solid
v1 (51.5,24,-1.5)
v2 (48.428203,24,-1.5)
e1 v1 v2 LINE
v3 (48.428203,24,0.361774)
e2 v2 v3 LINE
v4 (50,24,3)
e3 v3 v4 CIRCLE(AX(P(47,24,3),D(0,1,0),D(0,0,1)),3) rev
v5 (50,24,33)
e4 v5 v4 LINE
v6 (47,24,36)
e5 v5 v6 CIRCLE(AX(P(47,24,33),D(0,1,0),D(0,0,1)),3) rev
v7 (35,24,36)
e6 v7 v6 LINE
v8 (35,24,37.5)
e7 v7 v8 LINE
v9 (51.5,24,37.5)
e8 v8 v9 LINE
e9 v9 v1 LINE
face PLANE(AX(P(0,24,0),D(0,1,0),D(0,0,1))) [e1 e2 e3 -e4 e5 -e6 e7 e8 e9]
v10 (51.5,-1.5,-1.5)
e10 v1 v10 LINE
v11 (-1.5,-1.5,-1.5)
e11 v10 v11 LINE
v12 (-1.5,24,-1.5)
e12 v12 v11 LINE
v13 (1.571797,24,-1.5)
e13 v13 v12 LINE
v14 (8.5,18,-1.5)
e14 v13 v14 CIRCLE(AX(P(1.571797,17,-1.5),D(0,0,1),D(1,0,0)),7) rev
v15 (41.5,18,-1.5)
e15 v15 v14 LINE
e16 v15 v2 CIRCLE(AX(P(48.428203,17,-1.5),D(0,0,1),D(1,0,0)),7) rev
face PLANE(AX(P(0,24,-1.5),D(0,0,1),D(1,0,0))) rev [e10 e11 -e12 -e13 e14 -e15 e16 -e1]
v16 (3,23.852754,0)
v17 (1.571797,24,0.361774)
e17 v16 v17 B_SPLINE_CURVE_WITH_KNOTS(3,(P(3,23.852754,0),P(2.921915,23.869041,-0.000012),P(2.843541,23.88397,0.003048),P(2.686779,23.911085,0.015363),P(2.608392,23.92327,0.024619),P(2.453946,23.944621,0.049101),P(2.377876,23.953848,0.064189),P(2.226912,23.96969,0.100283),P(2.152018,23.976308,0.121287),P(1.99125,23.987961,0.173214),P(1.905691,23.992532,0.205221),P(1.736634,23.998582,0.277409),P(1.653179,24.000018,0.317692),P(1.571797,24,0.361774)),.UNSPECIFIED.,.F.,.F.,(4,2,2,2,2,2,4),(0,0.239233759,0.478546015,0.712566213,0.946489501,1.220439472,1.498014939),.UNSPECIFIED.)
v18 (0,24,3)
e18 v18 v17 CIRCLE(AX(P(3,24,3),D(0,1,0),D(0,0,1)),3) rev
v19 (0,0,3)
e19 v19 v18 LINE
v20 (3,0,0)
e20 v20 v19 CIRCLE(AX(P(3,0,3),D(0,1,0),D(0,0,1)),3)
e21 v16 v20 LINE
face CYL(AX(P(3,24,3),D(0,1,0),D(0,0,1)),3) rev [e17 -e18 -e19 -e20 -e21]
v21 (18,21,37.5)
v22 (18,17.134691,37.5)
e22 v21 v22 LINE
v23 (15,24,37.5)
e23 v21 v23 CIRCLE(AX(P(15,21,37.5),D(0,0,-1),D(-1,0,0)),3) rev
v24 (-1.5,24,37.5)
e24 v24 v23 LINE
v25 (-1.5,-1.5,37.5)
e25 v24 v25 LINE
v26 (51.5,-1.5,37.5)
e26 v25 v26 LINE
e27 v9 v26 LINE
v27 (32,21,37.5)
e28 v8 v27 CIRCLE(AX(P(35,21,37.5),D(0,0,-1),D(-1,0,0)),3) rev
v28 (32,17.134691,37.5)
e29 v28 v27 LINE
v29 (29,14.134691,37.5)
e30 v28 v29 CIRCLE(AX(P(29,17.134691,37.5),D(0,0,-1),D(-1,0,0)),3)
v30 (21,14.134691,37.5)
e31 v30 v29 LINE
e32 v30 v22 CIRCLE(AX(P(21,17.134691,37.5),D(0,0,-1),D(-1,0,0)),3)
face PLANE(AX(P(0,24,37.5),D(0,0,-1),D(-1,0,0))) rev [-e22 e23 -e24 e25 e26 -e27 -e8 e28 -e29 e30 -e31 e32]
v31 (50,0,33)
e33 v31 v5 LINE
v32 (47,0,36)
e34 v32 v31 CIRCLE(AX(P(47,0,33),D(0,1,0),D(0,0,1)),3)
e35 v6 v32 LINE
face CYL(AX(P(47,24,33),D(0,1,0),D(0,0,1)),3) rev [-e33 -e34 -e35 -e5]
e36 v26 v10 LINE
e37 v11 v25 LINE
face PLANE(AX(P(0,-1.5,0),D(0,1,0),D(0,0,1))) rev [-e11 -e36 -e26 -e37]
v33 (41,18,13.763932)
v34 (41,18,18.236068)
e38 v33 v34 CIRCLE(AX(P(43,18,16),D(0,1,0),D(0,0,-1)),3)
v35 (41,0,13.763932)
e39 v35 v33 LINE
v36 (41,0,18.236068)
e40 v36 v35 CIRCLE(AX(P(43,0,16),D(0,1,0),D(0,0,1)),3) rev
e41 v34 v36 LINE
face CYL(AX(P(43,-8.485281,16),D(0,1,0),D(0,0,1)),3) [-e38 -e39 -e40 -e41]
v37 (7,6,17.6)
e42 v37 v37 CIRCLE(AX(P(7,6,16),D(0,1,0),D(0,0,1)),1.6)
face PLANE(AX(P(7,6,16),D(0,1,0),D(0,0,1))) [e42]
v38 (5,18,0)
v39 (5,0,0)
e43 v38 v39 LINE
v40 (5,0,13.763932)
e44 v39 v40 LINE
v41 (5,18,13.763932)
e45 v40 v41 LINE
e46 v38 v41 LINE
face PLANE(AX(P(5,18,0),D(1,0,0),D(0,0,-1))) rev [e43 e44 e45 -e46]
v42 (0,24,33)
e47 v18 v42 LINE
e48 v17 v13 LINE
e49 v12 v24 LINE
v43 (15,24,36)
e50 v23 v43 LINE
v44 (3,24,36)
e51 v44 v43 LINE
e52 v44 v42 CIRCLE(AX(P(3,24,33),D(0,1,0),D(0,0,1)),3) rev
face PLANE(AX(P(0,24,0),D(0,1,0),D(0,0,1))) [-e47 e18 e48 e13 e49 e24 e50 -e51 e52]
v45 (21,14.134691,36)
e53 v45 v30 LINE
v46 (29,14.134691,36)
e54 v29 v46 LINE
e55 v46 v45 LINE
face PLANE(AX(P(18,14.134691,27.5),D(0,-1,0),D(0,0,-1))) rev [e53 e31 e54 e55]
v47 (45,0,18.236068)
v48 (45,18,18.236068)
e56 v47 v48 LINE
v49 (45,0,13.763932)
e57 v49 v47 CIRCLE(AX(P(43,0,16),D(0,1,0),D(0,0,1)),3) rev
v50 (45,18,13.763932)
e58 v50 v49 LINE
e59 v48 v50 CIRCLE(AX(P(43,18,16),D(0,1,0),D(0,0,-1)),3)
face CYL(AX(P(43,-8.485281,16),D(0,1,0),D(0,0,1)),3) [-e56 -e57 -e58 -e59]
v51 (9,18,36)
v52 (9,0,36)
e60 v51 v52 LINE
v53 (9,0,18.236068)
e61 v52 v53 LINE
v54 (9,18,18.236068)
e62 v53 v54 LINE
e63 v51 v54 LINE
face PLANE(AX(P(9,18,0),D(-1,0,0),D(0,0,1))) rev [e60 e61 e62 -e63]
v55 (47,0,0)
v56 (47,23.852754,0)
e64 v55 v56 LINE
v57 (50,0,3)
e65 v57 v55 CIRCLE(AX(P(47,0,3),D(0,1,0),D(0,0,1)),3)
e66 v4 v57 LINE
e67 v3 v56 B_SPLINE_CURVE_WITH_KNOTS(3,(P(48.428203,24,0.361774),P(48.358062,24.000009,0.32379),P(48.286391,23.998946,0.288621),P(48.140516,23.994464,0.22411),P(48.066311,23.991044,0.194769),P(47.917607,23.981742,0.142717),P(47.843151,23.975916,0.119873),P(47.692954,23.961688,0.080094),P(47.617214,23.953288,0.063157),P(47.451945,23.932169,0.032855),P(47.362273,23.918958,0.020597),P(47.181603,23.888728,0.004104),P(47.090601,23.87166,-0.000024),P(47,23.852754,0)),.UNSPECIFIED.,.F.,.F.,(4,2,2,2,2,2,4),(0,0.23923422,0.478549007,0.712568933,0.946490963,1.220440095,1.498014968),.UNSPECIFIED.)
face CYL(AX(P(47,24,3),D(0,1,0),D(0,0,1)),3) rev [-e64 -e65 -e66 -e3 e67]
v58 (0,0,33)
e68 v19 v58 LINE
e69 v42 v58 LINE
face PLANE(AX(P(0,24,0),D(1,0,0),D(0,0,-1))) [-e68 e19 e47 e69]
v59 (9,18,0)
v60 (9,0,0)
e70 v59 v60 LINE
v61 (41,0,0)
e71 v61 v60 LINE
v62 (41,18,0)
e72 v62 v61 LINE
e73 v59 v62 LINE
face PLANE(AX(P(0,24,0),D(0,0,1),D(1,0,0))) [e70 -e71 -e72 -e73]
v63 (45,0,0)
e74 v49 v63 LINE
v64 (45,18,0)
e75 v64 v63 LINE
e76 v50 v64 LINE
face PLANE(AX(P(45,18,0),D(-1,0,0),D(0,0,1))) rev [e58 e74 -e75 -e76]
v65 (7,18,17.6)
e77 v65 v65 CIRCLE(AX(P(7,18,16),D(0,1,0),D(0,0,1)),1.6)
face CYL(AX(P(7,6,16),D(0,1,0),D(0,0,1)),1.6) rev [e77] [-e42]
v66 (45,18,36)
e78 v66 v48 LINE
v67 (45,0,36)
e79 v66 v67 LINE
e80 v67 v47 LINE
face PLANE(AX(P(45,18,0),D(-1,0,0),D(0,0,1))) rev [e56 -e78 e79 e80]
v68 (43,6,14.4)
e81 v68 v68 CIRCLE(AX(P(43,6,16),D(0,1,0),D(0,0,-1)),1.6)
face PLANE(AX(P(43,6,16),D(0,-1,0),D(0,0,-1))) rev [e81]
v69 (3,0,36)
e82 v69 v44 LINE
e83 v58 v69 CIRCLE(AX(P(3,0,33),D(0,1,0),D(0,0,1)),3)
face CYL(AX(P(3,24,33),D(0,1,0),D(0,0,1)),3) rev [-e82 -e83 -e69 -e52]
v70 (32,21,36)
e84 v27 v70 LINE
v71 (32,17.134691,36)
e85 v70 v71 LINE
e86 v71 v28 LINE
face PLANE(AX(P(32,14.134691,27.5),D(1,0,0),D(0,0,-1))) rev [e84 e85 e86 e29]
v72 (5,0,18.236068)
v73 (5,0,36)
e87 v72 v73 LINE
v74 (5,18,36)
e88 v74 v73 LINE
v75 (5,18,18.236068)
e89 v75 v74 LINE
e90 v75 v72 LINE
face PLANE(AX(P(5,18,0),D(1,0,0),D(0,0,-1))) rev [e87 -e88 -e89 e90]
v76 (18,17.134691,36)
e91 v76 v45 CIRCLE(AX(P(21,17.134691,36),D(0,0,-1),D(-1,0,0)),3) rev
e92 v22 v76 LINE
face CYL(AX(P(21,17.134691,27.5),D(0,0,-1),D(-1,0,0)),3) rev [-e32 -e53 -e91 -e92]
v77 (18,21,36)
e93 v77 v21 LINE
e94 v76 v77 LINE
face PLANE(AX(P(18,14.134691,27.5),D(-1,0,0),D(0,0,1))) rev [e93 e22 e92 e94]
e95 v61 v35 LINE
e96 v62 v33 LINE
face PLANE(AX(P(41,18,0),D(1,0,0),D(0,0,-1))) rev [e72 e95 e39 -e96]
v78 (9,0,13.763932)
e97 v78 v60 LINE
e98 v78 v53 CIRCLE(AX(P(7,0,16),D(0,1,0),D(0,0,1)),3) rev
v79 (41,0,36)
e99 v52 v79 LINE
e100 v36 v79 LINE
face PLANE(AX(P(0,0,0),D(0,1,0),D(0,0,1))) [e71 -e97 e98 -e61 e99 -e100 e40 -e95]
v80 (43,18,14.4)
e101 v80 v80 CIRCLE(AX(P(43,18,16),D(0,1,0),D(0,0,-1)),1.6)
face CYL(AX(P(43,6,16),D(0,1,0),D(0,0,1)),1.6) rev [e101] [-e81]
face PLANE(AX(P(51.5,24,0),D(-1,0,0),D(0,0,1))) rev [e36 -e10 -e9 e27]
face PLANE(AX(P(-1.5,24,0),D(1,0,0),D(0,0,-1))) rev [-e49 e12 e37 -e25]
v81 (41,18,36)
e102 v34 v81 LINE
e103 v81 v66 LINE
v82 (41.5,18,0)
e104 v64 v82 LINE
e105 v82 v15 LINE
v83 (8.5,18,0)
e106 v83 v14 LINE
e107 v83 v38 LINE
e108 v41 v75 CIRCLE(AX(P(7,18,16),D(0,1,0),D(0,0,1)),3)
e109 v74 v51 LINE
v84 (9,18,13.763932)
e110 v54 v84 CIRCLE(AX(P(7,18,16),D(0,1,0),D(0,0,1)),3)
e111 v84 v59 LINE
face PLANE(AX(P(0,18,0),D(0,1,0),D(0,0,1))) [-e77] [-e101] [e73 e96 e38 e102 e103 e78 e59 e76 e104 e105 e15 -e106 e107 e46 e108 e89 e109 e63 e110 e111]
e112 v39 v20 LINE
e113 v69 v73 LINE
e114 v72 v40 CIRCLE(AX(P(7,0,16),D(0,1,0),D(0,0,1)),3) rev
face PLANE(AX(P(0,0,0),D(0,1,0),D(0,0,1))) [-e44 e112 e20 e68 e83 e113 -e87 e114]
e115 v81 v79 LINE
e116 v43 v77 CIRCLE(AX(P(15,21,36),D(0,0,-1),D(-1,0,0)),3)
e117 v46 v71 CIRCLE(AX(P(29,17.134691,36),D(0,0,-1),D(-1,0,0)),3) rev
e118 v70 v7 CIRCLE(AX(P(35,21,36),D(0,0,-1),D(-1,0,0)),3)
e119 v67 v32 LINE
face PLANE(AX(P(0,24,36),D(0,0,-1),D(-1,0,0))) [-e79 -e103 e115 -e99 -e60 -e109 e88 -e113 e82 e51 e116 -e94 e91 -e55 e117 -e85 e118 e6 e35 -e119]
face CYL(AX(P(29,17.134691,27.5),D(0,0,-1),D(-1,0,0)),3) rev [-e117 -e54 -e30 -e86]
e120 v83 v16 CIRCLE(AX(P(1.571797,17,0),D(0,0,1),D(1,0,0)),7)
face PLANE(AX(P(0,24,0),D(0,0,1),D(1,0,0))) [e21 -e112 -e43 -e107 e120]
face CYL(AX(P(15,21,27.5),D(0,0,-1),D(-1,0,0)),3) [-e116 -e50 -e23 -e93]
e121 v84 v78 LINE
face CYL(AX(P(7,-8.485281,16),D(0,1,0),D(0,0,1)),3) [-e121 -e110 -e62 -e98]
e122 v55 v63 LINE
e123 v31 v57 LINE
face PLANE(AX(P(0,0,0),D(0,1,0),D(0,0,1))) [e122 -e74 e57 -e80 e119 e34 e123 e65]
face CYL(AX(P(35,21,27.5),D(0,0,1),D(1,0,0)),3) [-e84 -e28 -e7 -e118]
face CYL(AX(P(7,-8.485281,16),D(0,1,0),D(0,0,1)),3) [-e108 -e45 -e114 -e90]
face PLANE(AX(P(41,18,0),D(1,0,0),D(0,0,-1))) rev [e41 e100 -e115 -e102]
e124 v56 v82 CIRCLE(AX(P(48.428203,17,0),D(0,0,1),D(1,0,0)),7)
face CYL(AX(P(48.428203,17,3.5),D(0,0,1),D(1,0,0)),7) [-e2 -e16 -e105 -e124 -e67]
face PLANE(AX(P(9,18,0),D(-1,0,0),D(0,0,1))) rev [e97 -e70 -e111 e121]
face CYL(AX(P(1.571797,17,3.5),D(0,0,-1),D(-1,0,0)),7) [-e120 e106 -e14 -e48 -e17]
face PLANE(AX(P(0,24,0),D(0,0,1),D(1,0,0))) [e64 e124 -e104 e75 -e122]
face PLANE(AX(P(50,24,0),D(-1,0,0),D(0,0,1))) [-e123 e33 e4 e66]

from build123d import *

# Parameters (mm, degrees)
SKETCH1_W           = 50
SKETCH1_H           = 36
BOSS_EXTRUDE1_DEPTH = 24
SHELL1_T            = 1.5
SKETCH2_W           = 4
SKETCH2_H           = 36
BOSS_EXTRUDE2_DEPTH = 18
SKETCH6_W           = 14
SKETCH6_H           = 14
CUT_EXTRUDE2_DEPTH  = 10
FILLET1_R           = 3
SKETCH4_R           = 3
BOSS_EXTRUDE3_DEPTH = 18
SKETCH7_R           = 1.6
CUT_EXTRUDE3_DEPTH  = 12
SKETCH8_W           = 33
SKETCH8_H           = 8
CUT_EXTRUDE4_DEPTH  = 5
FILLET3_R           = 7


with BuildPart() as part:
    # Sketch1 → Boss-Extrude1 (new body)
    with BuildSketch(Plane(origin=(0, 0, 0), x_dir=(1, 0, 0), z_dir=(0, 1, 0))):
        with Locations((25, -18)):
            Rectangle(SKETCH1_W, SKETCH1_H)
    extrude(amount=BOSS_EXTRUDE1_DEPTH)

    # Shell1
    shell1_openings = [part.faces().sort_by_distance(p)[0] for p in [
        (25, 24, 18),
    ]]
    offset(amount=SHELL1_T, openings=shell1_openings, kind=Kind.INTERSECTION)

    # Sketch2 → Boss-Extrude2 (add)
    with BuildSketch(Plane(origin=(0, 0, 0), x_dir=(1, 0, 0), z_dir=(0, 1, 0))):
        with Locations((7, -18)):
            Rectangle(SKETCH2_W, SKETCH2_H)
        with Locations((43, -18)):
            Rectangle(SKETCH2_W, SKETCH2_H)
    extrude(amount=BOSS_EXTRUDE2_DEPTH)

    # Sketch6 → Cut-Extrude2 (cut)
    with BuildSketch(Plane.XY.offset(37.5)):
        with Locations((25, 21.134691447)):
            Rectangle(SKETCH6_W, SKETCH6_H)
    extrude(amount=-CUT_EXTRUDE2_DEPTH, mode=Mode.SUBTRACT)

    # Fillet1
    fillet1_edges = [part.edges().sort_by_distance(p)[0] for p in [
        (0, 12, 0),
        (0, 12, 36),
        (50, 12, 36),
        (50, 12, 0),
        (32, 24, 36.75),
        (18, 24, 36.75),
        (18, 14.134691447, 36.75),
        (32, 14.134691447, 36.75),
    ]]
    fillet(fillet1_edges, radius=FILLET1_R)

    # Sketch4 → Boss-Extrude3 (add)
    with BuildSketch(Plane(origin=(0, 18, 0), x_dir=(1, 0, 0), z_dir=(0, 1, 0))):
        with Locations((7, -16)):
            Circle(SKETCH4_R)
        with Locations((43, -16)):
            Circle(SKETCH4_R)
    extrude(amount=-BOSS_EXTRUDE3_DEPTH)

    # Sketch7 → Cut-Extrude3 (cut)
    with BuildSketch(Plane(origin=(0, 18, 0), x_dir=(1, 0, 0), z_dir=(0, 1, 0))):
        with Locations(Location((7, -16, 0), (0, 0, 270))):
            Circle(SKETCH7_R)
        with Locations(Location((43, -16, 0), (0, 0, 90))):
            Circle(SKETCH7_R)
    extrude(amount=-CUT_EXTRUDE3_DEPTH, mode=Mode.SUBTRACT)

    # Sketch8 → Cut-Extrude4 (cut)
    with BuildSketch(Plane(origin=(0, 0, -1.5), x_dir=(-1, 0, 0), z_dir=(0, 0, -1))):
        with Locations((-25, 22)):
            Rectangle(SKETCH8_W, SKETCH8_H)
    extrude(amount=-CUT_EXTRUDE4_DEPTH, mode=Mode.SUBTRACT)

    # Fillet3
    # the kernel refuses this fillet: 7 mm, written as the material it takes off along each edge
    with BuildSketch(Plane(origin=(41.5, 24, -18.820508076), x_dir=(0, -1, 0), z_dir=(0, 0, 1))) as fillet3_piece_1:
        with BuildLine():
            CenterArc((7, 6.92820323), FILLET3_R, 180, 81.786789298)
            Line((0, 6.92820323), (-0.14, 6.92820323))
            Line((-0.14, 6.92820323), (-0.14, 0))
            Line((-0.14, 0), (0, -0.14))
            ThreePointArc((0, -0.14), (3, -0.14), (5.98, -0.138564065))
            Line((5.98, -0.138564065), (6, 0))
        make_face()
    extrude(amount=36.141016151, mode=Mode.SUBTRACT)
    with BuildSketch(Plane(origin=(8.5, 24, 17.320508076), x_dir=(-1, 0, 0), z_dir=(0, 0, -1))) as fillet3_piece_2:
        with BuildLine():
            CenterArc((6.92820323, -7), FILLET3_R, 90, 81.786789298)
            Line((0, -6), (-0.138564065, -5.98))
            ThreePointArc((-0.138564065, -5.98), (-0.14, -3), (-0.14, 0))
            Line((-0.14, 0), (0, 0.14))
            Line((0, 0.14), (6.92820323, 0.14))
            Line((6.92820323, 0.14), (6.92820323, 0))
        make_face()
    extrude(amount=36.141016151, mode=Mode.SUBTRACT)


solid = part.part
